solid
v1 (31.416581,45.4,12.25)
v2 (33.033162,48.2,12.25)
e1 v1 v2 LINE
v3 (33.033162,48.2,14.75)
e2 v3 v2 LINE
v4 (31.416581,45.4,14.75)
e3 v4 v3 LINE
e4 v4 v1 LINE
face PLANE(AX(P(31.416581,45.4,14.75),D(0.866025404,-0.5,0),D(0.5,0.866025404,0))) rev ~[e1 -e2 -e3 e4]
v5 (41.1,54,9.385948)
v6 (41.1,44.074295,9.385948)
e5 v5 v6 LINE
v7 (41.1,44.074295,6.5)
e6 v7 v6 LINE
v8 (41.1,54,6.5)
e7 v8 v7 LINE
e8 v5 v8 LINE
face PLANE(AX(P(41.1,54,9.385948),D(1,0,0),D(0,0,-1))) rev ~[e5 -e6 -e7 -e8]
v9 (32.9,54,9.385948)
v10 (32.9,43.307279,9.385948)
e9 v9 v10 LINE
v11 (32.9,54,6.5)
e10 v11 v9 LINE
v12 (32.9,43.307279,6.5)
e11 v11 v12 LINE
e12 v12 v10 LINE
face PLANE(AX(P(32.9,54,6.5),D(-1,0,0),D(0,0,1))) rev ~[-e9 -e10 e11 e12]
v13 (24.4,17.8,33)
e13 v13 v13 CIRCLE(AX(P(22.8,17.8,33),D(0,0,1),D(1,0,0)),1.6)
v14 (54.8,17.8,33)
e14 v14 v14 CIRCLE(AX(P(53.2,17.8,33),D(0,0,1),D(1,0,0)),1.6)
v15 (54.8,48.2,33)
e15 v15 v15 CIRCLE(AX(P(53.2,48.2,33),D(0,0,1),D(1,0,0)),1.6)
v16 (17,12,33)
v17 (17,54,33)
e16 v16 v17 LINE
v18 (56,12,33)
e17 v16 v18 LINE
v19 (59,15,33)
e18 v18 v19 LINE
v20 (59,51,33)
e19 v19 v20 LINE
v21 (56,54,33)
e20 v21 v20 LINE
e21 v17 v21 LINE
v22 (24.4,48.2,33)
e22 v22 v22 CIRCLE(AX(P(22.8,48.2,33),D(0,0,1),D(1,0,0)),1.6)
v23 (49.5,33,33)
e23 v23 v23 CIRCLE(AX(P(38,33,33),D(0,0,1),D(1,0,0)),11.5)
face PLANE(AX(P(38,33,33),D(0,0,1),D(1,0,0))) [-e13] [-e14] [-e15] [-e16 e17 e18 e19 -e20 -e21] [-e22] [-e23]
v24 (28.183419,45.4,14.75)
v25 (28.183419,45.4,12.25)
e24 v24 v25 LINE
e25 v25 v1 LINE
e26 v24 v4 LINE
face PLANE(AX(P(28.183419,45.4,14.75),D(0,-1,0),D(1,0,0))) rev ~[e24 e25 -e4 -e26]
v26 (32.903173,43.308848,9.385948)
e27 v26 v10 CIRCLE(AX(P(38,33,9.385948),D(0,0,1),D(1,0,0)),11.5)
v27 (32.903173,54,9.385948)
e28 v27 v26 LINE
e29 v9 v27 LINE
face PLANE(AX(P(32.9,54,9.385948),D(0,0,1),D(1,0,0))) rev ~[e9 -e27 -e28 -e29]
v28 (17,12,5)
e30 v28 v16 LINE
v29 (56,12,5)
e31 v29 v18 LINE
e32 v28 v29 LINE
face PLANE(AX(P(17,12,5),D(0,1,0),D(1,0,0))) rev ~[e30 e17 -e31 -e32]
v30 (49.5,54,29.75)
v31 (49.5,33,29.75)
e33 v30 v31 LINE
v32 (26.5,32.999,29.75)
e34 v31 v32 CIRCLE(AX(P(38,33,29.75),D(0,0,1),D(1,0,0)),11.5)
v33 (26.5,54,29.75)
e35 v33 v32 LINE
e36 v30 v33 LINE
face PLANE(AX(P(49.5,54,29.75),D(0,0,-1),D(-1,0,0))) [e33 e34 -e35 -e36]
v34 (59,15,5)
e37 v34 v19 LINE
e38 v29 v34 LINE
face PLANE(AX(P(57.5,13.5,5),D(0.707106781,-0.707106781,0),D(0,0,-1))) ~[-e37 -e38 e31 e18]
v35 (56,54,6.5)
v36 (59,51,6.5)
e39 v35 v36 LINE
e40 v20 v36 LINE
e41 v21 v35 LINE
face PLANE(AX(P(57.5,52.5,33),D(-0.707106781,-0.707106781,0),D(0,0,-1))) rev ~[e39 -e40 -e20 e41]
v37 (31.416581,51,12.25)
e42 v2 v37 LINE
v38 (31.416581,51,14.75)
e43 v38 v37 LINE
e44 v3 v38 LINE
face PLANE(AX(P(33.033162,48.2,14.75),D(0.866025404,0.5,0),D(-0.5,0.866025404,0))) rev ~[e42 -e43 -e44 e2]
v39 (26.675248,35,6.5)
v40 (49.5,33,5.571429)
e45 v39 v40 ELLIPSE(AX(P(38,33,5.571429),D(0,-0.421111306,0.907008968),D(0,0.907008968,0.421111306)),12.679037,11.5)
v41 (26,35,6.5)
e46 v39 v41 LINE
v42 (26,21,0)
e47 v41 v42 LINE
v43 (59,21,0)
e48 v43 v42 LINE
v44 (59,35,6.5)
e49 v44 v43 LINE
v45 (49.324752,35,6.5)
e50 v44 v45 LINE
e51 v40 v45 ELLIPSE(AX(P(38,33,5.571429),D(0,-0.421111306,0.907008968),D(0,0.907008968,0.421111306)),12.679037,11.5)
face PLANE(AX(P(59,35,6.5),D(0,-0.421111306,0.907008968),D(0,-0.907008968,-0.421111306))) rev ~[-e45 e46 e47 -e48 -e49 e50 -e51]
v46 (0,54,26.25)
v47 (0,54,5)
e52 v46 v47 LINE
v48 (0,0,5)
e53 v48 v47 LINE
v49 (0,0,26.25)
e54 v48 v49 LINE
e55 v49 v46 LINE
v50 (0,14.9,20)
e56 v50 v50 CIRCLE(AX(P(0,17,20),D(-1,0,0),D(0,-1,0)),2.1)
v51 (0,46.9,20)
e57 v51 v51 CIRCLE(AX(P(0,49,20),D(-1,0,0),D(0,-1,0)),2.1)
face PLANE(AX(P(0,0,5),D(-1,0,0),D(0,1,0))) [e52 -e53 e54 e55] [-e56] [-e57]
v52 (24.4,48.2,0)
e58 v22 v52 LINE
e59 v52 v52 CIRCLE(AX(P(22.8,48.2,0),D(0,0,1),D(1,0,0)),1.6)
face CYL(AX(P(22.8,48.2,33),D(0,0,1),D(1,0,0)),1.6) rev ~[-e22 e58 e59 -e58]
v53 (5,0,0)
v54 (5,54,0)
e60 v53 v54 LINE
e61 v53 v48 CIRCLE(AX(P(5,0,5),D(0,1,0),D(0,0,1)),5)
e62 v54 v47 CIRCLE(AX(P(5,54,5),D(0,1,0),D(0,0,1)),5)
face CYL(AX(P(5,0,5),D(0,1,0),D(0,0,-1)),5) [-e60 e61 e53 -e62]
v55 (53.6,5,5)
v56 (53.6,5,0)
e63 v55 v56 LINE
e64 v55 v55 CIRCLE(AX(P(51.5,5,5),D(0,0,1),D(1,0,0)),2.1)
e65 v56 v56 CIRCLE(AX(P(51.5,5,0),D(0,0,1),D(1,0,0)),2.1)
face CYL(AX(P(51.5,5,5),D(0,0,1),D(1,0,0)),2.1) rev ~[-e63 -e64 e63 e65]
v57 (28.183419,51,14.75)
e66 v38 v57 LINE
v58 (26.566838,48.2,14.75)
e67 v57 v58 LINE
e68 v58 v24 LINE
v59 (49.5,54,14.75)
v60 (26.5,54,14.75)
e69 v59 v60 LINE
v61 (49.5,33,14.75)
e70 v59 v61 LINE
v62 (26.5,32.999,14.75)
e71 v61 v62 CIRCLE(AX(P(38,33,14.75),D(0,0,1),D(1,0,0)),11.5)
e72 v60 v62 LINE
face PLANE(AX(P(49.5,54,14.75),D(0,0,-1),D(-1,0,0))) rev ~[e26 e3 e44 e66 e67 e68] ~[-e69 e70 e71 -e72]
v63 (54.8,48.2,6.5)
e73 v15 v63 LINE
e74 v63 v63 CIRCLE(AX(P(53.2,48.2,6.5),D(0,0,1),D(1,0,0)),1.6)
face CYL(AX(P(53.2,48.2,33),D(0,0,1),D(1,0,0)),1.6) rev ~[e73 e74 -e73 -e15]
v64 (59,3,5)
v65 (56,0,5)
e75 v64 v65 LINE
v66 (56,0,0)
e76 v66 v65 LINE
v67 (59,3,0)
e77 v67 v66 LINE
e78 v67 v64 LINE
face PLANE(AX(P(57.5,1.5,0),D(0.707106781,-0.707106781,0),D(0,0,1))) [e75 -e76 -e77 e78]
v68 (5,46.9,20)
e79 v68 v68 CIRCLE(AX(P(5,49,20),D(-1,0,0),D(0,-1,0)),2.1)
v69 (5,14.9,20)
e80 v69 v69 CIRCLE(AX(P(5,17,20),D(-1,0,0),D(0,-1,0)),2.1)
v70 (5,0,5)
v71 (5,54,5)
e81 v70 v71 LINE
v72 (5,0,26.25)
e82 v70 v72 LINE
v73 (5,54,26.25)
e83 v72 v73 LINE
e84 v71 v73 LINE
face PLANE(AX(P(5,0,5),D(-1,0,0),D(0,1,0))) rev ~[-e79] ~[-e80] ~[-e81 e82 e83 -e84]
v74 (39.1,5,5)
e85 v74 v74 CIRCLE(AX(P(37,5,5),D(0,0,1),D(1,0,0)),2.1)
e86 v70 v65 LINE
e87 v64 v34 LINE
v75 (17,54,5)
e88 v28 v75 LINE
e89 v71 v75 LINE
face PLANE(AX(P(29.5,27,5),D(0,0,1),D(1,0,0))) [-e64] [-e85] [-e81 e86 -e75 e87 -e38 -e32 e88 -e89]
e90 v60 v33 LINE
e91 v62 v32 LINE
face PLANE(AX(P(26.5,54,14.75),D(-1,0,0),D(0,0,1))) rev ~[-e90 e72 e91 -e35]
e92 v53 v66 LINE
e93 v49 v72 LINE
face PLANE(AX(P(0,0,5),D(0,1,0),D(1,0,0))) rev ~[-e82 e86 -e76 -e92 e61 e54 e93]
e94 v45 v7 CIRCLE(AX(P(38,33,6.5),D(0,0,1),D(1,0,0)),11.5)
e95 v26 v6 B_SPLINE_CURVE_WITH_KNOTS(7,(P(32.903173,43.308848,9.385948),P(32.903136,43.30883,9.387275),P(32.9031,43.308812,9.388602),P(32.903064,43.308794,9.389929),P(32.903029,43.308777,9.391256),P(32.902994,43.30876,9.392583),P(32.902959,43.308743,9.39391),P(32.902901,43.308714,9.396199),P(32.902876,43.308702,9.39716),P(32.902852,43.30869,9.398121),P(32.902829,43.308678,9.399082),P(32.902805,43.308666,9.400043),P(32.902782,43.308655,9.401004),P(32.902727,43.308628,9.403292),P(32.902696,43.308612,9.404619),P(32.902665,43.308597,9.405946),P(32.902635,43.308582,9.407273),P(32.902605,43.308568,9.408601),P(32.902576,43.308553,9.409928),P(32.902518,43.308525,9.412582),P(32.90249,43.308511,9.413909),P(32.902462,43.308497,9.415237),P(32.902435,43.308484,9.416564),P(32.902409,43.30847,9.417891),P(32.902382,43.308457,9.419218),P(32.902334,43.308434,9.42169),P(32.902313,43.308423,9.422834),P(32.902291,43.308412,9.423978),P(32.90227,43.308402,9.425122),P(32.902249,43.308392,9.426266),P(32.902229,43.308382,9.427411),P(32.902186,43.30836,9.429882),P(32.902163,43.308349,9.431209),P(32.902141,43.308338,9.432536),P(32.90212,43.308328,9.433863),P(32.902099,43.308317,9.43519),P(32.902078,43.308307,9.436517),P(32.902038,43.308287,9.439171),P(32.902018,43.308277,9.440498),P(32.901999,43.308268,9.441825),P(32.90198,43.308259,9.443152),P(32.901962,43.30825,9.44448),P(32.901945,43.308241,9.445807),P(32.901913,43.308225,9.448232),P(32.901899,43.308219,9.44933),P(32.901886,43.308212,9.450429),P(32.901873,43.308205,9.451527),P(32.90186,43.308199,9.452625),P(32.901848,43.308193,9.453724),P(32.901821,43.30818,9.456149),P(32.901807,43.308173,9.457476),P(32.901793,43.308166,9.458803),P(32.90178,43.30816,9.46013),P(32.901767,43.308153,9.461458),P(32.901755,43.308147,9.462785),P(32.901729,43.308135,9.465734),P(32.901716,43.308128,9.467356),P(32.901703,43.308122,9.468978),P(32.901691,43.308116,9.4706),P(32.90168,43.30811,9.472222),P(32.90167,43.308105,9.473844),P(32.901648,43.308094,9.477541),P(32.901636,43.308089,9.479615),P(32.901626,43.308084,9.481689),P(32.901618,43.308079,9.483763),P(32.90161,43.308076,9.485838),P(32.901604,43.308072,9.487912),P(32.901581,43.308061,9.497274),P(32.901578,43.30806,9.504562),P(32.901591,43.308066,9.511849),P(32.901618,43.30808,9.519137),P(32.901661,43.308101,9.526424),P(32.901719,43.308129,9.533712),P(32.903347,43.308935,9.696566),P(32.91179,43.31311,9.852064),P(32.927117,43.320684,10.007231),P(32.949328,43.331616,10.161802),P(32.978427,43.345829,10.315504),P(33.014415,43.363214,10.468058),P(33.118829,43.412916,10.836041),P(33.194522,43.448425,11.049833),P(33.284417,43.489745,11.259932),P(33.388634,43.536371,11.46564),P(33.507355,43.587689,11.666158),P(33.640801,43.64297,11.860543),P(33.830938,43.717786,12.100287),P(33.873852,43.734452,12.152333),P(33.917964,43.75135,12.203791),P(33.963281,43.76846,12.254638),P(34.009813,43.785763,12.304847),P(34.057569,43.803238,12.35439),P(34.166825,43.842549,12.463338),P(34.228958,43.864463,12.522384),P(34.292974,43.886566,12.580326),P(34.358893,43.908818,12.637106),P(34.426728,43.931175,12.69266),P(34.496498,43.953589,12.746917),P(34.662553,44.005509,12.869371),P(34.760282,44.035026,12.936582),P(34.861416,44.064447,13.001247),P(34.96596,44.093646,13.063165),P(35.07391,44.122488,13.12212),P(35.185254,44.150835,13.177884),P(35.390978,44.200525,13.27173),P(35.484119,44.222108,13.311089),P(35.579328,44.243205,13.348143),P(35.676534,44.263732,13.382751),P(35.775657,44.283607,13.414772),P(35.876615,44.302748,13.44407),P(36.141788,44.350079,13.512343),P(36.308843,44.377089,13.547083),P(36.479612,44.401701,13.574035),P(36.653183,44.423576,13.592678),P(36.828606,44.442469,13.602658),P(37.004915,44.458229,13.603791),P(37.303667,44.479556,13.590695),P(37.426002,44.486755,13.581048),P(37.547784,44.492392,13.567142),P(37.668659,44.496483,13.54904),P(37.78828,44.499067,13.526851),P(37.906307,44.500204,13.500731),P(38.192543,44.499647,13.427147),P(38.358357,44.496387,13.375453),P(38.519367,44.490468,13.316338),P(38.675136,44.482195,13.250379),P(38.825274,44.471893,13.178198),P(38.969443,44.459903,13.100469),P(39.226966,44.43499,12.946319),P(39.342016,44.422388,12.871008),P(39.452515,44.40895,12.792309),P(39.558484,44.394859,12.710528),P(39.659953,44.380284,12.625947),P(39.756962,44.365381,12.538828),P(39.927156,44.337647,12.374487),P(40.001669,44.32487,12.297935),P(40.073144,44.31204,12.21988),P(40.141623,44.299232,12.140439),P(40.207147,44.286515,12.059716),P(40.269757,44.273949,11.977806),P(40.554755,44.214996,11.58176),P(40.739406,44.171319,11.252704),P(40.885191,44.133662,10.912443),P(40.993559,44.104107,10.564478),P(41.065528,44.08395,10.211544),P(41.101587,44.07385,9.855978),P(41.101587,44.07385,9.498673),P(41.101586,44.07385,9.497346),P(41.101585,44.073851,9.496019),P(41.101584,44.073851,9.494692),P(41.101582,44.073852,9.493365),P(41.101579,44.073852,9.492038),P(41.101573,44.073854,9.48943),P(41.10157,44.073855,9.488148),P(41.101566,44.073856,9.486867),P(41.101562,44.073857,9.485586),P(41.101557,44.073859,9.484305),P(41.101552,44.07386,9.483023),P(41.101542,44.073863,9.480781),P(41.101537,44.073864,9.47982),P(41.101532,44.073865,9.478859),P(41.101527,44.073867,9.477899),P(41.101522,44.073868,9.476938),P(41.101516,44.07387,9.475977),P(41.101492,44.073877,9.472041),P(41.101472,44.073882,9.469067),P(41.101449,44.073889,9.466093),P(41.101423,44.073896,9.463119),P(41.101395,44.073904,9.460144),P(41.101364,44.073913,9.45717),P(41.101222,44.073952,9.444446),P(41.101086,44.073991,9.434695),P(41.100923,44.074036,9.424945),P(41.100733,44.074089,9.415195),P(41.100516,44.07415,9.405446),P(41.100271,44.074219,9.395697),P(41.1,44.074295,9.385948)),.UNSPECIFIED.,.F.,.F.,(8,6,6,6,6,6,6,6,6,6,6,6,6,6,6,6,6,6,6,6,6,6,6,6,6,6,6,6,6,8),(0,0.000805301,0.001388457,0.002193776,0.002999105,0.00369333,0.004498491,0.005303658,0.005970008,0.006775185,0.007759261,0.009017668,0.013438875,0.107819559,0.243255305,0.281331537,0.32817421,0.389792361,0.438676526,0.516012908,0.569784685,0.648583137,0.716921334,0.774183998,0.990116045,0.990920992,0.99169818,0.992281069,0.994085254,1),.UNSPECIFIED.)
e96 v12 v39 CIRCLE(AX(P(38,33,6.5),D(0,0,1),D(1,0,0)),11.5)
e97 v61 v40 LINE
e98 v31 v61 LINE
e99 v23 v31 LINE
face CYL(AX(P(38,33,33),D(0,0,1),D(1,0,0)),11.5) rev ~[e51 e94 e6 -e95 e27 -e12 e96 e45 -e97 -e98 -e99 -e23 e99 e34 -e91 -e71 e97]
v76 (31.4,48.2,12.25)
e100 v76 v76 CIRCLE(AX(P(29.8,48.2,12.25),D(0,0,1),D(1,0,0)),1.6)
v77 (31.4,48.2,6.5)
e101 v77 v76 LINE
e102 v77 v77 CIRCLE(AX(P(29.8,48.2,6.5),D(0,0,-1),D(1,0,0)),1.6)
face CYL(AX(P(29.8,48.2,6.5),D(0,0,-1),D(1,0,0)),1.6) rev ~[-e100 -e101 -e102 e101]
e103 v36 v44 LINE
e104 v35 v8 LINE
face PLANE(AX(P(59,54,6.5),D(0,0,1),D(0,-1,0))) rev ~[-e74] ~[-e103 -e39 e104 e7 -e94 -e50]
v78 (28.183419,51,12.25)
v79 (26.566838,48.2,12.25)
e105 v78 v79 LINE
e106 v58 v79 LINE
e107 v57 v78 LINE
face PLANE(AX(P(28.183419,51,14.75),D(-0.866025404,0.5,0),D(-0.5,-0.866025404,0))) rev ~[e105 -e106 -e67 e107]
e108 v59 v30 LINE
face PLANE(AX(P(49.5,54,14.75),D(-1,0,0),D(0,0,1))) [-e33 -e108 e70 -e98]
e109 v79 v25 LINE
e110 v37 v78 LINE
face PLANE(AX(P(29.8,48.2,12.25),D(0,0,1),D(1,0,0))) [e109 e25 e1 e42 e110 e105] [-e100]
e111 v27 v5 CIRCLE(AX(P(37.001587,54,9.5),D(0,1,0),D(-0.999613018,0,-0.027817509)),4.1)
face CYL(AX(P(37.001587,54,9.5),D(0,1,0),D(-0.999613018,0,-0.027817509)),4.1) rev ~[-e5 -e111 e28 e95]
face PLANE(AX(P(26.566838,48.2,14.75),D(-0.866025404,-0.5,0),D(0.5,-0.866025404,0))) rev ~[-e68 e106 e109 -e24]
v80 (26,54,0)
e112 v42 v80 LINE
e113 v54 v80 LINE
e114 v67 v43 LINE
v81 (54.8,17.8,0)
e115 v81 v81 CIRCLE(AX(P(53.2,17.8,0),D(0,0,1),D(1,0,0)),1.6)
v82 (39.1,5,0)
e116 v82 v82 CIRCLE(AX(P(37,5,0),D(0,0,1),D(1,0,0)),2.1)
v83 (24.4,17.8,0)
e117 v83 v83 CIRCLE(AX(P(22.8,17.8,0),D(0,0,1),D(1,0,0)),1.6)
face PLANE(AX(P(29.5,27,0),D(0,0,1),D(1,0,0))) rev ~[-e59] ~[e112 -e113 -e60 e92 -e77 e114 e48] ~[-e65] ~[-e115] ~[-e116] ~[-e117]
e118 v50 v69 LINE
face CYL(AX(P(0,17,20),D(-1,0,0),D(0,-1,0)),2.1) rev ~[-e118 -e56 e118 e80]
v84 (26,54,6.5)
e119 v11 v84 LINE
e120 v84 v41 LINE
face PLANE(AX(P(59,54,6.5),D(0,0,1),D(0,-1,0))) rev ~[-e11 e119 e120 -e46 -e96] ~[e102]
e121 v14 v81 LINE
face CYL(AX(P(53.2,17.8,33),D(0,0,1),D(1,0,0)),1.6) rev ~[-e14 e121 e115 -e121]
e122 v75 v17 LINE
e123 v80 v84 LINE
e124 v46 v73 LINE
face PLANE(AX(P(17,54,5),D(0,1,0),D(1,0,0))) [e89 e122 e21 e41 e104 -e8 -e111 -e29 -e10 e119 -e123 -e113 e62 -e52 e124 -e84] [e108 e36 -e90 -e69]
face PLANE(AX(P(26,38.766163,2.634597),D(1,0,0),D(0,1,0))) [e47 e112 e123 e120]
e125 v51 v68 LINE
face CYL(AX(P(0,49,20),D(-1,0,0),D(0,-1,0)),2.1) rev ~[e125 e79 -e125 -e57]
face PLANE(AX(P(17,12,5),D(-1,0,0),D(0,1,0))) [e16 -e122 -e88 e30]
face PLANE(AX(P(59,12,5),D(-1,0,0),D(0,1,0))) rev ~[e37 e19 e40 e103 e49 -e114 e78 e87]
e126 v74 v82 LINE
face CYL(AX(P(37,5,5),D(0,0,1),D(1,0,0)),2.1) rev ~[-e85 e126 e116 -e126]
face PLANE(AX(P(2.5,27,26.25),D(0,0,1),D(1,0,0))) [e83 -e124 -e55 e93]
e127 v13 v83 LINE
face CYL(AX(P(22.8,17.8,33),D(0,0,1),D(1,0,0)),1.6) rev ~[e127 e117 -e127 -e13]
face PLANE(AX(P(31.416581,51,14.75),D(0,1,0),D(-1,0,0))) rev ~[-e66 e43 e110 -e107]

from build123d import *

# Parameters (mm, degrees)
F0_W      = 59
F0_H      = 54
F1_DEPTH  = 5
F2_W      = 5
F2_H      = 54
F3_DEPTH  = 21.25
F4_W      = 42
F4_H      = 42
F5_DEPTH  = 28
F6_R      = 1.6
F6_R_2    = 11.5
F7_DEPTH  = 33.001
F8_R      = 2.1
F9_DEPTH  = 5.001
F10_W     = 23
F10_H     = 15
F11_DEPTH = 21.001
F13_DEPTH = 33
F14_SIZE  = 3
F16_DEPTH = 10.6937211186
F17_R     = 5
F18_R     = 1.6
F19_DEPTH = 8.25
F20_R     = 1.6
F21_DEPTH = 2.5
F22_R     = 2.1
F23_DEPTH = 5


with BuildPart() as f1:
    # F0 (on Top) → F1 (new body)
    with BuildSketch(Plane.XY):
        with Locations((29.5, 27)):
            Rectangle(F0_W, F0_H)
    extrude(amount=F1_DEPTH)

    # F2 (on face) → F3 (join)
    with BuildSketch(Plane.XY.offset(5)):
        with Locations((2.5, 27)):
            Rectangle(F2_W, F2_H)
    extrude(amount=F3_DEPTH)

    # F4 (on face) → F5 (join)
    with BuildSketch(Plane.XY.offset(5)):
        with Locations((38, 33)):
            Rectangle(F4_W, F4_H)
    extrude(amount=F5_DEPTH)

    # F6 (on face) → F7 (cut, through all)
    with BuildSketch(Plane.XY.offset(33)):
        with Locations((22.8, 48.2)):
            Circle(F6_R)
        with Locations((38, 33)):
            Circle(F6_R_2)
        with Locations((53.2, 48.2)):
            Circle(F6_R)
        with Locations((22.8, 17.8)):
            Circle(F6_R)
        with Locations((53.2, 17.8)):
            Circle(F6_R)
    extrude(amount=-F7_DEPTH, mode=Mode.SUBTRACT)

    # F8 (on face) → F9 (cut, through all)
    with BuildSketch(Plane.XY.offset(5)):
        with Locations((37, 5)):
            Circle(F8_R)
        with Locations((51.5, 5)):
            Circle(F8_R)
    extrude(amount=-F9_DEPTH, mode=Mode.SUBTRACT)

    # F10 (on face) → F11 (cut, through all)
    with BuildSketch(Plane(origin=(0, 54, 0), x_dir=(-1, 0, 0), z_dir=(0, 1, 0))):
        with Locations((-38, 22.25)):
            Rectangle(F10_W, F10_H)
    extrude(amount=-F11_DEPTH, mode=Mode.SUBTRACT)

    # F12 (on face) → F13 (cut)
    with BuildSketch(Plane.YZ.offset(59)):
        Polygon((54, 0), (54, 6.5), (35, 6.5), (21, 0), align=None)
    extrude(amount=-F13_DEPTH, mode=Mode.SUBTRACT)

    # F14
    f14_edges = [f1.edges().sort_by_distance(p)[0] for p in [
        (59, 0, 2.5),
        (59, 12, 19),
        (59, 54, 19.75),
    ]]
    chamfer(f14_edges, length=F14_SIZE)

    # F15 (on face) → F16 (cut, through all)
    with BuildSketch(Plane(origin=(0, 54, 0), x_dir=(-1, 0, 0), z_dir=(0, 1, 0))):
        with BuildLine():
            Line((-32.9, 9.385948213), (-32.9031732506, 9.385948213))
            ThreePointArc((-32.9031732506, 9.385948213), (-37.0015866253, 13.6), (-41.1, 9.385948213))
            Line((-41.1, 9.385948213), (-41.1, 6.5))
            Line((-41.1, 6.5), (-32.9, 6.5))
            Line((-32.9, 6.5), (-32.9, 9.385948213))
        make_face()
    extrude(amount=-F16_DEPTH, mode=Mode.SUBTRACT)

    # F17
    f17_edges = [f1.edges().sort_by_distance(p)[0] for p in [
        (0, 27, 0),
    ]]
    fillet(f17_edges, radius=F17_R)

    # F18 (on face) → F19 (cut, through all)
    with BuildSketch(Plane(origin=(0, 0, 6.5), x_dir=(1, 0, 0), z_dir=(0, 0, -1))):
        with Locations((29.8, -48.2)):
            Circle(F18_R)
    extrude(amount=-F19_DEPTH, mode=Mode.SUBTRACT)

    # F20 (on face) → F21 (cut)
    with BuildSketch(Plane.XY.offset(14.75)):
        Polygon((31.4165807537, 45.4), (33.0331615075, 48.2), (31.4165807537, 51), (28.1834192463, 51), (26.5668384925, 48.2), (28.1834192463, 45.4), align=None)
        with Locations((29.8, 48.2)):
            Circle(F20_R, mode=Mode.SUBTRACT)
    extrude(amount=-F21_DEPTH, mode=Mode.SUBTRACT)

    # F22 (on face) → F23 (cut, through all)
    with BuildSketch(Plane(origin=(0, 0, 0), x_dir=(0, -1, 0), z_dir=(-1, 0, 0))):
        with Locations((-49, 20)):
            Circle(F22_R)
        with Locations((-17, 20)):
            Circle(F22_R)
    extrude(amount=-F23_DEPTH, mode=Mode.SUBTRACT)


solid = f1.part
